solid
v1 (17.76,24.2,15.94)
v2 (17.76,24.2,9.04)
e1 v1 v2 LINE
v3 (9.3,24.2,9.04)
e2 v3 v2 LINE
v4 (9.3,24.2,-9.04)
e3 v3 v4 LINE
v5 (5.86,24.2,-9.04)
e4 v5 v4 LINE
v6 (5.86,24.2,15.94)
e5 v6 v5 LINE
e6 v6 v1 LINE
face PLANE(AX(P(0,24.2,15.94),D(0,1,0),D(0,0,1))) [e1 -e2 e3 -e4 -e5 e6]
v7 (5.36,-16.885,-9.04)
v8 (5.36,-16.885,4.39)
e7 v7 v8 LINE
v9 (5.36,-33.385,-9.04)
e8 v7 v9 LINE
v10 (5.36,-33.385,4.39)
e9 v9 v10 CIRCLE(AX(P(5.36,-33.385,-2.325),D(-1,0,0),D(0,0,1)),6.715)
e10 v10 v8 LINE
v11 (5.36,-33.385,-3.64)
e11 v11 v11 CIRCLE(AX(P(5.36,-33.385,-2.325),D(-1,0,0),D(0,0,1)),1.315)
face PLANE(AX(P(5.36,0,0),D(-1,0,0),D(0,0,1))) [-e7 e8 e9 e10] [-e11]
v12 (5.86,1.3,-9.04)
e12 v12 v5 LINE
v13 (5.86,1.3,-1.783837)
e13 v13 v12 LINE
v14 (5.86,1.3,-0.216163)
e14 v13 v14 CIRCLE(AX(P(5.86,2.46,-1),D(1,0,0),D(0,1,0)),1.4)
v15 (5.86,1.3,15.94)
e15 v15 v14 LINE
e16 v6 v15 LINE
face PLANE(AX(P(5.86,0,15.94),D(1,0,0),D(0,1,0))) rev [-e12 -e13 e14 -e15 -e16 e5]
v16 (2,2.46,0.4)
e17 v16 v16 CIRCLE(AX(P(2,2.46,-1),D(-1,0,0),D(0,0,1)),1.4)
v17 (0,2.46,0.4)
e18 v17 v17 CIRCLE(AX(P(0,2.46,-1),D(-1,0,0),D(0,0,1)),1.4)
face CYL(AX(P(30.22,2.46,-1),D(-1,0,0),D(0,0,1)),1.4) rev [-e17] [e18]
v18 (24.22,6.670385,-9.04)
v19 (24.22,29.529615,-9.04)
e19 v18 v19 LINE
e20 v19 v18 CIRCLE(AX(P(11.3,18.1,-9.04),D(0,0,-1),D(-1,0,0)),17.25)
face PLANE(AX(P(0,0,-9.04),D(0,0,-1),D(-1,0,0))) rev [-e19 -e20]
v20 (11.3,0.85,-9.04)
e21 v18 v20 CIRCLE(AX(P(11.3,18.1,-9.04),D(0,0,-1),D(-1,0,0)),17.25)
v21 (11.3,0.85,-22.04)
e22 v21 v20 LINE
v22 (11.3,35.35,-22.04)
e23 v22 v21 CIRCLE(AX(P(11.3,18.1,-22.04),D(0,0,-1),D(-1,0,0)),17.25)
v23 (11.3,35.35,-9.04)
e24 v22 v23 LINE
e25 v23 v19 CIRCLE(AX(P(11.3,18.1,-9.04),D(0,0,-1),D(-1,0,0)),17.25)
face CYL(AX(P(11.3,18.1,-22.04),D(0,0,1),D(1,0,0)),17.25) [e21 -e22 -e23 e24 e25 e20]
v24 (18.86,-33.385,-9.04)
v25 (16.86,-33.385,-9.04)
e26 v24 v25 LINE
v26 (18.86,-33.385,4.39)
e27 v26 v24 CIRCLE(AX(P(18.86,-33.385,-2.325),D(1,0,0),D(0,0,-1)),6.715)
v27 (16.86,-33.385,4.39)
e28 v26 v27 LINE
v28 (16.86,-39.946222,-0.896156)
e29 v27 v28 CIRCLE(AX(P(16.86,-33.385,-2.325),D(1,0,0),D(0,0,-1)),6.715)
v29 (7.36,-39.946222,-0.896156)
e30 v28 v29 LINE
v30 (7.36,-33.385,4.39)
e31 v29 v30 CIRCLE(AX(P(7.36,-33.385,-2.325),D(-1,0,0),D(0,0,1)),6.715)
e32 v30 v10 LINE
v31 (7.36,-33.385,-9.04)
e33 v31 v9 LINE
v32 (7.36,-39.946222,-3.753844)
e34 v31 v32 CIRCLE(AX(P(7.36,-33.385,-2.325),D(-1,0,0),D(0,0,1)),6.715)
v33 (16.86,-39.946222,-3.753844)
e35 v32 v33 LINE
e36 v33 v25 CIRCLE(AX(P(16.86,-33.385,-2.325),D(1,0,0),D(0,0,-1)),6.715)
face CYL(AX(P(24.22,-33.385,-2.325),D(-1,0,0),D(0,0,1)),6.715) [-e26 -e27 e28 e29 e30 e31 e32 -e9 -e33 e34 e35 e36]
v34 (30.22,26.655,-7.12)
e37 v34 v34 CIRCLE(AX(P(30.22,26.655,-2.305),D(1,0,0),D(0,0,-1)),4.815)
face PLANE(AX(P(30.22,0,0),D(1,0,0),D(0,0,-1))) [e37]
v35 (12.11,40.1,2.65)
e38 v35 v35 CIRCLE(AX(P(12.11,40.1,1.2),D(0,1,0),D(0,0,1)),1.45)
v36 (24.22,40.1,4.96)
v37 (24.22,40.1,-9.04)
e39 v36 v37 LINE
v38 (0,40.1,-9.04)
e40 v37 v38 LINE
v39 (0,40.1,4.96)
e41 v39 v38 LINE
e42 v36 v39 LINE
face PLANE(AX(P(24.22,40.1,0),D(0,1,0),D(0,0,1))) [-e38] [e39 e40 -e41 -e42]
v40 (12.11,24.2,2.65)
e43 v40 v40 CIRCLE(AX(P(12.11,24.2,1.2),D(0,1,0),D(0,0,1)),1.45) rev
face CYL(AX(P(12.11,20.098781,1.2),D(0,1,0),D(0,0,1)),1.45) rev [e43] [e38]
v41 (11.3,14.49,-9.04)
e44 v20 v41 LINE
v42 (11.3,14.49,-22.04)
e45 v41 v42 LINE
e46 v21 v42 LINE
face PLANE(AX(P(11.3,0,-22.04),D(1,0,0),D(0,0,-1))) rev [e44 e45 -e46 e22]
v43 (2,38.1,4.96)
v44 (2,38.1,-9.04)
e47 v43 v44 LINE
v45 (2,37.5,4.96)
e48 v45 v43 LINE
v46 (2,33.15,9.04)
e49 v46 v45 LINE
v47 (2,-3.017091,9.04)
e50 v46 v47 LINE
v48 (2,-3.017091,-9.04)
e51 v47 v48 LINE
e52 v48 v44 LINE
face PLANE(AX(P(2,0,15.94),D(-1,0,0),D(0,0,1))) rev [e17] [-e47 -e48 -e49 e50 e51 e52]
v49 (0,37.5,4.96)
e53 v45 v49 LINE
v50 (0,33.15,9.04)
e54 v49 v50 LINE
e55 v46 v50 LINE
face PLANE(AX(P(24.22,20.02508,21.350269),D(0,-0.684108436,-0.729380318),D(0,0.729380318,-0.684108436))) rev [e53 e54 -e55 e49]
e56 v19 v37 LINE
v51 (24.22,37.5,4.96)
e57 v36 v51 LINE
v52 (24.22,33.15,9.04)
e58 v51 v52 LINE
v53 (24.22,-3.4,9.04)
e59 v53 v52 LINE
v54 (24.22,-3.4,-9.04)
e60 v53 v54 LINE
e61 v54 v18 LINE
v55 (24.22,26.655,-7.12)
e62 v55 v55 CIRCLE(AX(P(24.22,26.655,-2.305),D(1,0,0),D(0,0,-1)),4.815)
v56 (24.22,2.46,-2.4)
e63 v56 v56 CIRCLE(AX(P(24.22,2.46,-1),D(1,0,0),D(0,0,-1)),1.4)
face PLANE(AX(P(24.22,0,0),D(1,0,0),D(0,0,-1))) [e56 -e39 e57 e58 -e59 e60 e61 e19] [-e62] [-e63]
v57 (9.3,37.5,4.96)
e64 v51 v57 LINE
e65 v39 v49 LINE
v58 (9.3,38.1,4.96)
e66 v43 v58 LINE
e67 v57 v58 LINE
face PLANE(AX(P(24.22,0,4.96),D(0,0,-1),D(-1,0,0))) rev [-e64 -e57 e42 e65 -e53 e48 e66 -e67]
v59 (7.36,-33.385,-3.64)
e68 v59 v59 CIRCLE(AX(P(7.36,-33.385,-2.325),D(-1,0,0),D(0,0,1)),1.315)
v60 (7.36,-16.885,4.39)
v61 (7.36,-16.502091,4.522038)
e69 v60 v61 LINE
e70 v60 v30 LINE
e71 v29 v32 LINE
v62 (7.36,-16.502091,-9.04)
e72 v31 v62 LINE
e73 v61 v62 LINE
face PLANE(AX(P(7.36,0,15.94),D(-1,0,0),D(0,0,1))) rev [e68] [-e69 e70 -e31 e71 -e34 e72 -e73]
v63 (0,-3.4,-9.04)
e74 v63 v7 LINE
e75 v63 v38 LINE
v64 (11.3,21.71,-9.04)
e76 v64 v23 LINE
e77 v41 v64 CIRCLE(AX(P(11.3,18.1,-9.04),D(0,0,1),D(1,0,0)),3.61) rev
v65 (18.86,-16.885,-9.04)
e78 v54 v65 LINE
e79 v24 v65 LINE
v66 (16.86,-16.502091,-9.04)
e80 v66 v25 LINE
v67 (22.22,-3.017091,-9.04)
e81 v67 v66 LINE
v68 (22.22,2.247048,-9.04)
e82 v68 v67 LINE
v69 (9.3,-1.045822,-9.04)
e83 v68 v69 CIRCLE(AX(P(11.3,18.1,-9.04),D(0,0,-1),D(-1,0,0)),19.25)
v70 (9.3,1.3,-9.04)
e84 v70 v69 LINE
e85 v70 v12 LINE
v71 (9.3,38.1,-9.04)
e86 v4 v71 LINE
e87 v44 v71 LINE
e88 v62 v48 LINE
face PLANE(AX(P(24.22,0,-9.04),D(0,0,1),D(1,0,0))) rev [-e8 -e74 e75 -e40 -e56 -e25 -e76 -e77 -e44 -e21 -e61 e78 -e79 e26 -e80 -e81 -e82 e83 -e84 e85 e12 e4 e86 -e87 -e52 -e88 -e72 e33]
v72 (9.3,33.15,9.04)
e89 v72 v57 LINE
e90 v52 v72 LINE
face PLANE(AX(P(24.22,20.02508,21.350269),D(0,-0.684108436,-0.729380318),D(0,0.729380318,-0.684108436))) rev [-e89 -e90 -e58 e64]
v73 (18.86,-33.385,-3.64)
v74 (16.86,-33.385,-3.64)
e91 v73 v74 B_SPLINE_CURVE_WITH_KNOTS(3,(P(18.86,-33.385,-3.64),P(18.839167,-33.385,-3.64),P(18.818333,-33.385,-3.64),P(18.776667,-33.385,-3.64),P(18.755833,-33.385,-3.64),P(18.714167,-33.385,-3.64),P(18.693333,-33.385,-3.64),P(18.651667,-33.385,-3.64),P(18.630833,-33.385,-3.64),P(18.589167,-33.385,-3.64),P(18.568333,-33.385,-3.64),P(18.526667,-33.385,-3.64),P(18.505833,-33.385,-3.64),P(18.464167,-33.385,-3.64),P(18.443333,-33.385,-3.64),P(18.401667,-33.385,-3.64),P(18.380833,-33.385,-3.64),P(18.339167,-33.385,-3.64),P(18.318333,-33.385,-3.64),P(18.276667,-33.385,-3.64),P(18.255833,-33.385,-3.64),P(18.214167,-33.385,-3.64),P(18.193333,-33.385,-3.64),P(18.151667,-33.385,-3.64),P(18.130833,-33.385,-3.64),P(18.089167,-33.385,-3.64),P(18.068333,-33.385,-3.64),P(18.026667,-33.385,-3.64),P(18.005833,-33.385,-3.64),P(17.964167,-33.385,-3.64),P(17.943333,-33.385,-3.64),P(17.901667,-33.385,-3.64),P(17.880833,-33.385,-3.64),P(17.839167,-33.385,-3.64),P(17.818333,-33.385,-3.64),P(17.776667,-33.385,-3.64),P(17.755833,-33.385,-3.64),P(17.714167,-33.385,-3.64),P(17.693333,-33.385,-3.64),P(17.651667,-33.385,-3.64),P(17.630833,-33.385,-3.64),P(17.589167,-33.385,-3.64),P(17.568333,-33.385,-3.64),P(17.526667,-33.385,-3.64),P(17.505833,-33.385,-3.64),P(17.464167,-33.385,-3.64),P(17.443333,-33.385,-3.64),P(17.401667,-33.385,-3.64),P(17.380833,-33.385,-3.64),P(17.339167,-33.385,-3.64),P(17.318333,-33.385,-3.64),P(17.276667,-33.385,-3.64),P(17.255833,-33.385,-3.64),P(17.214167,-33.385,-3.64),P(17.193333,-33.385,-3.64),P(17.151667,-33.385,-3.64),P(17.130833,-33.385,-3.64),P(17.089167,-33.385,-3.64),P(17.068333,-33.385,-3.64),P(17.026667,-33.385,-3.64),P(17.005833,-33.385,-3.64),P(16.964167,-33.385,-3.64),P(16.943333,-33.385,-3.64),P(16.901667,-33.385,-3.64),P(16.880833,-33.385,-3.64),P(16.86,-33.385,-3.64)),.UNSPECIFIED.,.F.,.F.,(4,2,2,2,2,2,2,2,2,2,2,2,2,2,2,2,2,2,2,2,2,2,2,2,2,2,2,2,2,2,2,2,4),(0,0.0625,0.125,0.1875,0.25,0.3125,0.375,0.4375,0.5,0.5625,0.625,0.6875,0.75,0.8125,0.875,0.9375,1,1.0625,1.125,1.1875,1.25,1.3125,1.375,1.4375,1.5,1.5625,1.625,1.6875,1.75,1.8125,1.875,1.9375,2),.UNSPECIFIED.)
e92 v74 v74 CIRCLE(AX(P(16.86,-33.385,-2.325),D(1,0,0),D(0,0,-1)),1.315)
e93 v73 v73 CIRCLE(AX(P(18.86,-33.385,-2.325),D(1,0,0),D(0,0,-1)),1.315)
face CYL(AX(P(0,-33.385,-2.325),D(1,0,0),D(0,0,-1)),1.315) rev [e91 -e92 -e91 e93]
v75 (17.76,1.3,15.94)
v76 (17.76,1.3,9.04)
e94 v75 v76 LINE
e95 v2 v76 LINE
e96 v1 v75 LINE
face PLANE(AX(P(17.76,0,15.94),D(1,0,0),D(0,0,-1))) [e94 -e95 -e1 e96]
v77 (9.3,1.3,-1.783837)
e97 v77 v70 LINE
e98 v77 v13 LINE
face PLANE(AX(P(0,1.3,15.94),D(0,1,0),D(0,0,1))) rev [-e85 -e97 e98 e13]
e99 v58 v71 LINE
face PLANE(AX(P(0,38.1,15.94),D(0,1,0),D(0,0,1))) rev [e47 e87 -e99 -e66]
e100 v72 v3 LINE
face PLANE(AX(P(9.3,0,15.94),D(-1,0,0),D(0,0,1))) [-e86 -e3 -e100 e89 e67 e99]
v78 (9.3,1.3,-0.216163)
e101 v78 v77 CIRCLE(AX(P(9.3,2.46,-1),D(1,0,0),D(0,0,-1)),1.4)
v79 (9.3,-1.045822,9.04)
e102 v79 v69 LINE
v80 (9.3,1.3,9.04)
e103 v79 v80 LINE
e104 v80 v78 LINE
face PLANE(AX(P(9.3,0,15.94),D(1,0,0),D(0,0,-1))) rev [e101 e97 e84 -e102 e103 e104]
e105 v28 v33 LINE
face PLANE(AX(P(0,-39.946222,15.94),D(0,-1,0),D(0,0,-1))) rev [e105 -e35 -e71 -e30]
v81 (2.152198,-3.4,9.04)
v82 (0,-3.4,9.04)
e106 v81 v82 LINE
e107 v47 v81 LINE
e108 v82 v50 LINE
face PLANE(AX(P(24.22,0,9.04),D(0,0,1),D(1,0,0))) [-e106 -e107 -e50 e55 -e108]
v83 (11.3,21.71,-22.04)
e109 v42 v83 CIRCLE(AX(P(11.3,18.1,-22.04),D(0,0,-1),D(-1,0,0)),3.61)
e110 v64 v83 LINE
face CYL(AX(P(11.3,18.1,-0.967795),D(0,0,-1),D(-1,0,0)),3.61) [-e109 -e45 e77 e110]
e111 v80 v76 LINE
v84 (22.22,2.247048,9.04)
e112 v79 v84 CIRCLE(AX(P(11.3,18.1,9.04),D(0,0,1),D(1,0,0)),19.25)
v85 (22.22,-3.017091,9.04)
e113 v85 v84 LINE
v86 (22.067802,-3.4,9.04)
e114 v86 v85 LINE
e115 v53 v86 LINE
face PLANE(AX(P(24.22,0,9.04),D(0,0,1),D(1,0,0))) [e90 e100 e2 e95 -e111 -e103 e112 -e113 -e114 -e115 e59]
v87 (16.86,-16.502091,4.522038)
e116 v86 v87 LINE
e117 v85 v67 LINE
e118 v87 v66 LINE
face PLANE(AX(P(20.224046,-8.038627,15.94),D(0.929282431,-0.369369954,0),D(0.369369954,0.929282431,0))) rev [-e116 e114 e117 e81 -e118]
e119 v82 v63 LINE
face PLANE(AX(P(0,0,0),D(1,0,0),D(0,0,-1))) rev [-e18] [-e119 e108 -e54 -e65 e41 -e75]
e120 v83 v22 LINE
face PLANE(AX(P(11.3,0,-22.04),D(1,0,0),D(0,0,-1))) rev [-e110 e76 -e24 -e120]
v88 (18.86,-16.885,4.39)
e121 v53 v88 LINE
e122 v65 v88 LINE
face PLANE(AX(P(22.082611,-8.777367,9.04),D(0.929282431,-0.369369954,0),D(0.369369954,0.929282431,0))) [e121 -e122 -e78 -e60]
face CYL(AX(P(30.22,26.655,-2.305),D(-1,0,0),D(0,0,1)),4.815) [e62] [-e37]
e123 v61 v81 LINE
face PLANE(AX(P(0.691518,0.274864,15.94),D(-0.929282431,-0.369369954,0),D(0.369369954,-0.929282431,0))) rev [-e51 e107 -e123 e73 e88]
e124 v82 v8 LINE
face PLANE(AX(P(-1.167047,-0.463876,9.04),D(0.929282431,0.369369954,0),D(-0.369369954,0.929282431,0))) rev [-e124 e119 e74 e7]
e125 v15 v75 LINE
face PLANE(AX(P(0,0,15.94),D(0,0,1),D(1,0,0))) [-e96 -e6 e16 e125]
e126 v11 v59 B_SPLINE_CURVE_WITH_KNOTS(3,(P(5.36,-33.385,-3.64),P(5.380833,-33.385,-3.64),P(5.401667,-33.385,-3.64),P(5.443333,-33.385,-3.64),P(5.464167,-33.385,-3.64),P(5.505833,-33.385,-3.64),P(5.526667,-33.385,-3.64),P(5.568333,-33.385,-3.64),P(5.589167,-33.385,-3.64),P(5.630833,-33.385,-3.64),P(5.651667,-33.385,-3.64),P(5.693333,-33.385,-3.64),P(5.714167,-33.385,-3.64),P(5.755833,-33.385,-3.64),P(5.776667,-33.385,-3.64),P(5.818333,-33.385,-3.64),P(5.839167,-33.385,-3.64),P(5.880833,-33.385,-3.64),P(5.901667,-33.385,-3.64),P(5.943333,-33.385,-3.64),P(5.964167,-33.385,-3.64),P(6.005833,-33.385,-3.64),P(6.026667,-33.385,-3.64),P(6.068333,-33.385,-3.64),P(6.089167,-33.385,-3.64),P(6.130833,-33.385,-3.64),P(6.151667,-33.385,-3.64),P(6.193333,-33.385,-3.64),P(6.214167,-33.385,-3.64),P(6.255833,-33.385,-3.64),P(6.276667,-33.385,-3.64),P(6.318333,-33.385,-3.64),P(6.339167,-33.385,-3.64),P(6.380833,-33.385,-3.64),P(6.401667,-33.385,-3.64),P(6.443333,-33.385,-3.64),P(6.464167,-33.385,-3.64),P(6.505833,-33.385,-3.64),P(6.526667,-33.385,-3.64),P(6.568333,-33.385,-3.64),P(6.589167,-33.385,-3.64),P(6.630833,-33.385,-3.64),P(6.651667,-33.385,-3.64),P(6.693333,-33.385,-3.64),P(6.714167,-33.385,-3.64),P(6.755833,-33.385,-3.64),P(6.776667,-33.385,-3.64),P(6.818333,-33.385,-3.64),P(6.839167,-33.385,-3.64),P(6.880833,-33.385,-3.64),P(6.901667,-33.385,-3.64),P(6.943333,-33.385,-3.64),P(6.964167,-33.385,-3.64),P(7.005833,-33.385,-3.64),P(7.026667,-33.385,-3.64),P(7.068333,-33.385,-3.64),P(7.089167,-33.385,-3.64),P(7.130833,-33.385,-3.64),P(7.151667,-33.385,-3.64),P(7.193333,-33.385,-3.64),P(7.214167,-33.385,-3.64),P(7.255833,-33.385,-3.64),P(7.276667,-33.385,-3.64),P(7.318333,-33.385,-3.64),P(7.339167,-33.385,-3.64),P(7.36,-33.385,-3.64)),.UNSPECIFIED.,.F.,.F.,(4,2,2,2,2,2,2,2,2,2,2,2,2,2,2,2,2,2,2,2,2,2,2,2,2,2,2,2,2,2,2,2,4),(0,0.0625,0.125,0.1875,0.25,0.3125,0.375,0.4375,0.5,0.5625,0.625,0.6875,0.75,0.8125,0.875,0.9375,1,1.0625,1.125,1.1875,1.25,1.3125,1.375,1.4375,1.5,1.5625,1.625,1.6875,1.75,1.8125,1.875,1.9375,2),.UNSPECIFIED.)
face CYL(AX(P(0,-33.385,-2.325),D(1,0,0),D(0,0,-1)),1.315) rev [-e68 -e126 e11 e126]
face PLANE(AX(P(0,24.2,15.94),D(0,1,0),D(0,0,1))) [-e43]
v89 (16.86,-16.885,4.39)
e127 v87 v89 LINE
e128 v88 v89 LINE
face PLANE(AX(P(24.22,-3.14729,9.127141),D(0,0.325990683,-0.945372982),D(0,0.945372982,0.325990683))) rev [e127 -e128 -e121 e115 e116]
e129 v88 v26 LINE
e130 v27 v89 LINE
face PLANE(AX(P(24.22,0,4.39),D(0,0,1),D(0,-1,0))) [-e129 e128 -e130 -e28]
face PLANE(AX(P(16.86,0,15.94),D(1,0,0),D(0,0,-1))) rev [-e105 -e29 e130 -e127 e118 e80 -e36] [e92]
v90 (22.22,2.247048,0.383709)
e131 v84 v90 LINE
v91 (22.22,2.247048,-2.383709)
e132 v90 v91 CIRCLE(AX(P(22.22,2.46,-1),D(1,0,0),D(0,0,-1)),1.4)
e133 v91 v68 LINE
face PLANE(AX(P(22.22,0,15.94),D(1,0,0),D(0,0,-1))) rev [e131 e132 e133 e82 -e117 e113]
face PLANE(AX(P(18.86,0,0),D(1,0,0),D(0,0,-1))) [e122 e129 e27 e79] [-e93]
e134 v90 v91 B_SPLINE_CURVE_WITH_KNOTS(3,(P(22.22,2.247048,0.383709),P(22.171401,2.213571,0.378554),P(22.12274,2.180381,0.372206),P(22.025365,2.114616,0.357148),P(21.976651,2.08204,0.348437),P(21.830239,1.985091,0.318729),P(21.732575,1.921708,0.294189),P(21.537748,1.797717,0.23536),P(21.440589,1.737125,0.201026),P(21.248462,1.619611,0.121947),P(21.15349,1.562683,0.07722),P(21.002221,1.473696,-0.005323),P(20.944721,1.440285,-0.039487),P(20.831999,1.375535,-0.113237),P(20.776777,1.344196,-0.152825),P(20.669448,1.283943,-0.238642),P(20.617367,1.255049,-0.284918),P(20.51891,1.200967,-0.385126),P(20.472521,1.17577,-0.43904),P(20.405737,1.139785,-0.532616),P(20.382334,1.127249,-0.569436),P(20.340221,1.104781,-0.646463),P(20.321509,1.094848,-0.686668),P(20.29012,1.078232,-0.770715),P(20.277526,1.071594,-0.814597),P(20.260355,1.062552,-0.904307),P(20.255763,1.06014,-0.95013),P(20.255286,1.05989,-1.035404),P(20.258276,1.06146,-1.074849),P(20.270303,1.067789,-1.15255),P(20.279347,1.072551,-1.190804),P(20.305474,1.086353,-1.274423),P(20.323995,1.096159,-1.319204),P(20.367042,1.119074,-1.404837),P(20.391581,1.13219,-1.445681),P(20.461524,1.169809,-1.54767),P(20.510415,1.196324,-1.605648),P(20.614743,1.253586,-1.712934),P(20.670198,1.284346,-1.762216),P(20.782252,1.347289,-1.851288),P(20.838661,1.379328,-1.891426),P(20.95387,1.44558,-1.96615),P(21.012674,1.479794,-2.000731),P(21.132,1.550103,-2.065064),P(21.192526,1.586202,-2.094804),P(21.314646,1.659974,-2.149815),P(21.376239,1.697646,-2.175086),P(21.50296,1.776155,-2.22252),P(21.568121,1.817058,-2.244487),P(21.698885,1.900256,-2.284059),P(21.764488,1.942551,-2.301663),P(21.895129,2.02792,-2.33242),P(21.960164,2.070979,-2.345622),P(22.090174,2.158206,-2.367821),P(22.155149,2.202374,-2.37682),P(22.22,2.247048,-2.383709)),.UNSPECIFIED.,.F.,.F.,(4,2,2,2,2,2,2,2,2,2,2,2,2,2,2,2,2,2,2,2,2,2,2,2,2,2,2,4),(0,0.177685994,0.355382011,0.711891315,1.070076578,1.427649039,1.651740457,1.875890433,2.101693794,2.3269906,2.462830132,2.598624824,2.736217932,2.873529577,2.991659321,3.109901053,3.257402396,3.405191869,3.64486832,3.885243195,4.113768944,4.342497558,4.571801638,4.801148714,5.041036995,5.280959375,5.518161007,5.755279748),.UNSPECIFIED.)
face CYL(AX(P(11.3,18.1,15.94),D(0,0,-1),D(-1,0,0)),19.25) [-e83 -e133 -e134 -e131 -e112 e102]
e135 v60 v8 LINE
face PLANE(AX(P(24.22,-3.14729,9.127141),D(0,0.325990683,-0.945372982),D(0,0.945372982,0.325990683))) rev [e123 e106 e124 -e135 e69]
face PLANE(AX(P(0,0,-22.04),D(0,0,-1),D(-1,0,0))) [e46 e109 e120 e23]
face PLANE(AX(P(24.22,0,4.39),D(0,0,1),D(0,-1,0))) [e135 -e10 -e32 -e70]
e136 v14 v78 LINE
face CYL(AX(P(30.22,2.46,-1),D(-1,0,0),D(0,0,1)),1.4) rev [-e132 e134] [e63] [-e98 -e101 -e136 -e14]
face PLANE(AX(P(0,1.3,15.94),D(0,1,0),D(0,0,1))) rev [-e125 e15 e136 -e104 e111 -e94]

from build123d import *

# Parameters (mm, degrees)
SKETCH_1_W          = 14
SKETCH_1_H          = 2.6
EXTRUDE_1_DEPTH     = 24.22
CUT_EXTRUDE_START   = -5.36
CUT_EXTRUDE_1_DEPTH = 5.36
CUT_EXTRUDE_2_DEPTH = 5.36
CUT_EXTRUDE_3_DEPTH = 51.214587522
SKETCH_6_R          = 4.815
EXTRUDE_3_DEPTH     = 6
EXTRUDE_4_DEPTH     = 13
SKETCH_10_W         = 11.9
SKETCH_10_H         = 22.9
EXTRUDE_5_DEPTH     = 6.9
CUT_EXTRUDE_START_2 = -18.08
CUT_EXTRUDE_4_DEPTH = 18.08
SKETCH_12_R         = 1.315
CUT_EXTRUDE_5_DEPTH = 50.492132708
SKETCH_13_R         = 1.4
CUT_EXTRUDE_6_DEPTH = 55.836301845
SKETCH_14_R         = 1.45
CUT_EXTRUDE_7_DEPTH = 15.9
EXTRUDE_6_DEPTH     = 13


# Read off the part's stored shape, not the designer's step: 切除-拉伸4
with BuildPart() as part:
    # 草图1 → 凸台-拉伸1 (new body)
    with BuildSketch(Plane(origin=(0, 0, 0), x_dir=(0, 0, -1), z_dir=(1, 0, 0))):
        with Locations((2.04, 38.8)):
            Rectangle(SKETCH_1_W, SKETCH_1_H)
        Polygon((-9.04, 33.15), (-9.04, -3.4), (9.04, -3.4), (9.04, 37.5), (-4.96, 37.5), (-4.96, 33.15), align=None)
        Polygon((-4.96, 33.15), (-9.04, 33.15), (-4.96, 37.5), align=None)
        Polygon((9.04, -3.4), (-9.04, -3.4), (-4.39, -16.885), (9.04, -16.885), align=None)
        with BuildLine():
            Line((9.04, -16.885), (-4.39, -16.885))
            Line((-4.39, -16.885), (-4.39, -33.385))
            ThreePointArc((-4.39, -33.385), (2.325, -26.67), (9.04, -33.385))
            Line((9.04, -33.385), (9.04, -16.885))
        make_face()
        with BuildLine():
            ThreePointArc((9.04, -33.385), (2.325, -26.67), (-4.39, -33.385))
            Line((-4.39, -33.385), (9.04, -33.385))
        make_face()
        with BuildLine():
            Line((9.04, -33.385), (-4.39, -33.385))
            ThreePointArc((-4.39, -33.385), (-2.423222036, -38.133222036), (2.325, -40.1))
            ThreePointArc((2.325, -40.1), (7.073222036, -38.133222036), (9.04, -33.385))
        make_face()
        with BuildLine():
            ThreePointArc((9.04, -33.385), (2.325, -26.67), (-4.39, -33.385))
            Line((-4.39, -33.385), (9.04, -33.385))
        make_face()
        with BuildLine():
            Line((9.04, -33.385), (-4.39, -33.385))
            ThreePointArc((-4.39, -33.385), (-2.423222036, -38.133222036), (2.325, -40.1))
            ThreePointArc((2.325, -40.1), (7.073222036, -38.133222036), (9.04, -33.385))
        make_face()
    extrude(amount=EXTRUDE_1_DEPTH)

    # 草图2 → 切除-拉伸1 (cut)
    with BuildSketch(Plane(origin=(24.22, 0, 0), x_dir=(0, 0, -1), z_dir=(1, 0, 0)).offset(CUT_EXTRUDE_START)):
        with BuildLine():
            Line((9.04, -33.385), (9.04, -16.885))
            Line((9.04, -16.885), (-4.39, -16.885))
            Line((-4.39, -16.885), (-4.39, -33.385))
            ThreePointArc((-4.39, -33.385), (2.325, -40.1), (9.04, -33.385))
        make_face()
    extrude(amount=CUT_EXTRUDE_1_DEPTH, mode=Mode.SUBTRACT)

    # 草图3 → 切除-拉伸2 (cut)
    with BuildSketch(Plane.ZY):
        with BuildLine():
            Line((4.39, -16.885), (-9.04, -16.885))
            Line((-9.04, -16.885), (-9.04, -33.385))
            ThreePointArc((-9.04, -33.385), (-2.325, -40.1), (4.39, -33.385))
            Line((4.39, -33.385), (4.39, -16.885))
        make_face()
    extrude(amount=-CUT_EXTRUDE_2_DEPTH, mode=Mode.SUBTRACT)

    # 草图4 → 切除-拉伸3 (cut, through all)
    with BuildSketch(Plane(origin=(0, 0, -9.04), x_dir=(-1, 0, 0), z_dir=(0, 0, -1))):
        Polygon((-18.86, -16.885), (-24.22, -3.4), (-24.22, -16.885), align=None)
        Polygon((0, -16.885), (0, -3.4), (-5.36, -16.885), align=None)
    extrude(amount=-CUT_EXTRUDE_3_DEPTH, mode=Mode.SUBTRACT)

    # 草图6 → 凸台-拉伸3 (add)
    with BuildSketch(Plane(origin=(24.22, 0, 0), x_dir=(0, 0, -1), z_dir=(1, 0, 0))):
        with Locations((2.305, 26.655)):
            Circle(SKETCH_6_R)
    extrude(amount=EXTRUDE_3_DEPTH)

    # 草图8 → 凸台-拉伸4 (add)
    with BuildSketch(Plane(origin=(0, 0, -9.04), x_dir=(-1, 0, 0), z_dir=(0, 0, -1))):
        with BuildLine():
            Line((-11.3, 0.85), (-11.3, 18.1))
            Line((-11.3, 18.1), (-11.3, 35.35))
            ThreePointArc((-11.3, 35.35), (-18.385253719, 33.827736002), (-24.22, 29.529615042))
            Line((-24.22, 29.529615042), (-24.22, 6.670384958))
            ThreePointArc((-24.22, 6.670384958), (-18.385253719, 2.372263998), (-11.3, 0.85))
        make_face()
        with BuildLine():
            Line((-24.22, 6.670384958), (-24.22, 29.529615042))
            ThreePointArc((-24.22, 29.529615042), (-28.55, 18.1), (-24.22, 6.670384958))
        make_face()
    extrude(amount=EXTRUDE_4_DEPTH)

    # 草图10 → 凸台-拉伸5 (add)
    with BuildSketch(Plane.XY.offset(9.04)):
        with Locations((11.81, 12.75)):
            Rectangle(SKETCH_10_W, SKETCH_10_H)
    extrude(amount=EXTRUDE_5_DEPTH)

    # 切除-拉伸4 outline → 切除-拉伸4 (cut)
    with BuildSketch(Plane(origin=(0, 0, -9.04), x_dir=(-1, 0, 0), z_dir=(0, 0, -1)).offset(CUT_EXTRUDE_START_2)):
        with BuildLine():
            Line((-9.3, 24.2), (-5.86, 24.2))
            Line((-5.86, 24.2), (-5.86, 1.3))
            Line((-5.86, 1.3), (-9.3, 1.3))
            Line((-9.3, 1.3), (-9.3, -1.045821999))
            ThreePointArc((-9.3, -1.045821999), (-16.054192627, -0.553690049), (-22.22, 2.247047594))
            Line((-22.22, 2.247047594), (-22.22, -3.017090844))
            Line((-22.22, -3.017090844), (-16.86, -16.502090844))
            Line((-16.86, -16.502090844), (-16.86, -39.946221742))
            Line((-16.86, -39.946221742), (-7.36, -39.946221742))
            Line((-7.36, -39.946221742), (-7.36, -16.502090844))
            Line((-7.36, -16.502090844), (-2, -3.017090844))
            Line((-2, -3.017090844), (-2, 38.1))
            Line((-2, 38.1), (-9.3, 38.1))
            Line((-9.3, 38.1), (-9.3, 24.2))
        make_face()
    extrude(amount=CUT_EXTRUDE_4_DEPTH, mode=Mode.SUBTRACT)

    # 草图12 → 切除-拉伸5 (cut, through all)
    with BuildSketch(Plane(origin=(18.86, 0, 0), x_dir=(0, 0, -1), z_dir=(1, 0, 0))):
        with Locations((2.325, -33.385)):
            Circle(SKETCH_12_R)
    extrude(amount=-CUT_EXTRUDE_5_DEPTH, mode=Mode.SUBTRACT)

    # 草图13 → 切除-拉伸6 (cut, through all)
    with BuildSketch(Plane.ZY):
        with Locations(Location((-1, 2.46, 0), (0, 0, 304.04773237))):
            Circle(SKETCH_13_R)
    extrude(amount=-CUT_EXTRUDE_6_DEPTH, mode=Mode.SUBTRACT)

    # 草图14 → 切除-拉伸7 (cut)
    with BuildSketch(Plane(origin=(0, 40.1, 0), x_dir=(1, 0, 0), z_dir=(0, 1, 0))):
        with Locations(Location((12.11, -1.2, 0), (0, 0, 270))):
            Circle(SKETCH_14_R)
    extrude(amount=-CUT_EXTRUDE_7_DEPTH, mode=Mode.SUBTRACT)

    # 草图15 → 凸台-拉伸6 (add)
    with BuildSketch(Plane(origin=(0, 0, -22.04), x_dir=(-1, 0, 0), z_dir=(0, 0, -1))):
        with BuildLine():
            ThreePointArc((-11.3, 21.71), (-14.91, 18.1), (-11.3, 14.49))
            Line((-11.3, 14.49), (-11.3, 21.71))
        make_face()
        with BuildLine():
            Line((-11.3, 21.71), (-11.3, 14.49))
            ThreePointArc((-11.3, 14.49), (-8.74734452, 15.54734452), (-7.69, 18.1))
            ThreePointArc((-7.69, 18.1), (-8.74734452, 20.65265548), (-11.3, 21.71))
        make_face()
    extrude(amount=-EXTRUDE_6_DEPTH)


solid = part.part
